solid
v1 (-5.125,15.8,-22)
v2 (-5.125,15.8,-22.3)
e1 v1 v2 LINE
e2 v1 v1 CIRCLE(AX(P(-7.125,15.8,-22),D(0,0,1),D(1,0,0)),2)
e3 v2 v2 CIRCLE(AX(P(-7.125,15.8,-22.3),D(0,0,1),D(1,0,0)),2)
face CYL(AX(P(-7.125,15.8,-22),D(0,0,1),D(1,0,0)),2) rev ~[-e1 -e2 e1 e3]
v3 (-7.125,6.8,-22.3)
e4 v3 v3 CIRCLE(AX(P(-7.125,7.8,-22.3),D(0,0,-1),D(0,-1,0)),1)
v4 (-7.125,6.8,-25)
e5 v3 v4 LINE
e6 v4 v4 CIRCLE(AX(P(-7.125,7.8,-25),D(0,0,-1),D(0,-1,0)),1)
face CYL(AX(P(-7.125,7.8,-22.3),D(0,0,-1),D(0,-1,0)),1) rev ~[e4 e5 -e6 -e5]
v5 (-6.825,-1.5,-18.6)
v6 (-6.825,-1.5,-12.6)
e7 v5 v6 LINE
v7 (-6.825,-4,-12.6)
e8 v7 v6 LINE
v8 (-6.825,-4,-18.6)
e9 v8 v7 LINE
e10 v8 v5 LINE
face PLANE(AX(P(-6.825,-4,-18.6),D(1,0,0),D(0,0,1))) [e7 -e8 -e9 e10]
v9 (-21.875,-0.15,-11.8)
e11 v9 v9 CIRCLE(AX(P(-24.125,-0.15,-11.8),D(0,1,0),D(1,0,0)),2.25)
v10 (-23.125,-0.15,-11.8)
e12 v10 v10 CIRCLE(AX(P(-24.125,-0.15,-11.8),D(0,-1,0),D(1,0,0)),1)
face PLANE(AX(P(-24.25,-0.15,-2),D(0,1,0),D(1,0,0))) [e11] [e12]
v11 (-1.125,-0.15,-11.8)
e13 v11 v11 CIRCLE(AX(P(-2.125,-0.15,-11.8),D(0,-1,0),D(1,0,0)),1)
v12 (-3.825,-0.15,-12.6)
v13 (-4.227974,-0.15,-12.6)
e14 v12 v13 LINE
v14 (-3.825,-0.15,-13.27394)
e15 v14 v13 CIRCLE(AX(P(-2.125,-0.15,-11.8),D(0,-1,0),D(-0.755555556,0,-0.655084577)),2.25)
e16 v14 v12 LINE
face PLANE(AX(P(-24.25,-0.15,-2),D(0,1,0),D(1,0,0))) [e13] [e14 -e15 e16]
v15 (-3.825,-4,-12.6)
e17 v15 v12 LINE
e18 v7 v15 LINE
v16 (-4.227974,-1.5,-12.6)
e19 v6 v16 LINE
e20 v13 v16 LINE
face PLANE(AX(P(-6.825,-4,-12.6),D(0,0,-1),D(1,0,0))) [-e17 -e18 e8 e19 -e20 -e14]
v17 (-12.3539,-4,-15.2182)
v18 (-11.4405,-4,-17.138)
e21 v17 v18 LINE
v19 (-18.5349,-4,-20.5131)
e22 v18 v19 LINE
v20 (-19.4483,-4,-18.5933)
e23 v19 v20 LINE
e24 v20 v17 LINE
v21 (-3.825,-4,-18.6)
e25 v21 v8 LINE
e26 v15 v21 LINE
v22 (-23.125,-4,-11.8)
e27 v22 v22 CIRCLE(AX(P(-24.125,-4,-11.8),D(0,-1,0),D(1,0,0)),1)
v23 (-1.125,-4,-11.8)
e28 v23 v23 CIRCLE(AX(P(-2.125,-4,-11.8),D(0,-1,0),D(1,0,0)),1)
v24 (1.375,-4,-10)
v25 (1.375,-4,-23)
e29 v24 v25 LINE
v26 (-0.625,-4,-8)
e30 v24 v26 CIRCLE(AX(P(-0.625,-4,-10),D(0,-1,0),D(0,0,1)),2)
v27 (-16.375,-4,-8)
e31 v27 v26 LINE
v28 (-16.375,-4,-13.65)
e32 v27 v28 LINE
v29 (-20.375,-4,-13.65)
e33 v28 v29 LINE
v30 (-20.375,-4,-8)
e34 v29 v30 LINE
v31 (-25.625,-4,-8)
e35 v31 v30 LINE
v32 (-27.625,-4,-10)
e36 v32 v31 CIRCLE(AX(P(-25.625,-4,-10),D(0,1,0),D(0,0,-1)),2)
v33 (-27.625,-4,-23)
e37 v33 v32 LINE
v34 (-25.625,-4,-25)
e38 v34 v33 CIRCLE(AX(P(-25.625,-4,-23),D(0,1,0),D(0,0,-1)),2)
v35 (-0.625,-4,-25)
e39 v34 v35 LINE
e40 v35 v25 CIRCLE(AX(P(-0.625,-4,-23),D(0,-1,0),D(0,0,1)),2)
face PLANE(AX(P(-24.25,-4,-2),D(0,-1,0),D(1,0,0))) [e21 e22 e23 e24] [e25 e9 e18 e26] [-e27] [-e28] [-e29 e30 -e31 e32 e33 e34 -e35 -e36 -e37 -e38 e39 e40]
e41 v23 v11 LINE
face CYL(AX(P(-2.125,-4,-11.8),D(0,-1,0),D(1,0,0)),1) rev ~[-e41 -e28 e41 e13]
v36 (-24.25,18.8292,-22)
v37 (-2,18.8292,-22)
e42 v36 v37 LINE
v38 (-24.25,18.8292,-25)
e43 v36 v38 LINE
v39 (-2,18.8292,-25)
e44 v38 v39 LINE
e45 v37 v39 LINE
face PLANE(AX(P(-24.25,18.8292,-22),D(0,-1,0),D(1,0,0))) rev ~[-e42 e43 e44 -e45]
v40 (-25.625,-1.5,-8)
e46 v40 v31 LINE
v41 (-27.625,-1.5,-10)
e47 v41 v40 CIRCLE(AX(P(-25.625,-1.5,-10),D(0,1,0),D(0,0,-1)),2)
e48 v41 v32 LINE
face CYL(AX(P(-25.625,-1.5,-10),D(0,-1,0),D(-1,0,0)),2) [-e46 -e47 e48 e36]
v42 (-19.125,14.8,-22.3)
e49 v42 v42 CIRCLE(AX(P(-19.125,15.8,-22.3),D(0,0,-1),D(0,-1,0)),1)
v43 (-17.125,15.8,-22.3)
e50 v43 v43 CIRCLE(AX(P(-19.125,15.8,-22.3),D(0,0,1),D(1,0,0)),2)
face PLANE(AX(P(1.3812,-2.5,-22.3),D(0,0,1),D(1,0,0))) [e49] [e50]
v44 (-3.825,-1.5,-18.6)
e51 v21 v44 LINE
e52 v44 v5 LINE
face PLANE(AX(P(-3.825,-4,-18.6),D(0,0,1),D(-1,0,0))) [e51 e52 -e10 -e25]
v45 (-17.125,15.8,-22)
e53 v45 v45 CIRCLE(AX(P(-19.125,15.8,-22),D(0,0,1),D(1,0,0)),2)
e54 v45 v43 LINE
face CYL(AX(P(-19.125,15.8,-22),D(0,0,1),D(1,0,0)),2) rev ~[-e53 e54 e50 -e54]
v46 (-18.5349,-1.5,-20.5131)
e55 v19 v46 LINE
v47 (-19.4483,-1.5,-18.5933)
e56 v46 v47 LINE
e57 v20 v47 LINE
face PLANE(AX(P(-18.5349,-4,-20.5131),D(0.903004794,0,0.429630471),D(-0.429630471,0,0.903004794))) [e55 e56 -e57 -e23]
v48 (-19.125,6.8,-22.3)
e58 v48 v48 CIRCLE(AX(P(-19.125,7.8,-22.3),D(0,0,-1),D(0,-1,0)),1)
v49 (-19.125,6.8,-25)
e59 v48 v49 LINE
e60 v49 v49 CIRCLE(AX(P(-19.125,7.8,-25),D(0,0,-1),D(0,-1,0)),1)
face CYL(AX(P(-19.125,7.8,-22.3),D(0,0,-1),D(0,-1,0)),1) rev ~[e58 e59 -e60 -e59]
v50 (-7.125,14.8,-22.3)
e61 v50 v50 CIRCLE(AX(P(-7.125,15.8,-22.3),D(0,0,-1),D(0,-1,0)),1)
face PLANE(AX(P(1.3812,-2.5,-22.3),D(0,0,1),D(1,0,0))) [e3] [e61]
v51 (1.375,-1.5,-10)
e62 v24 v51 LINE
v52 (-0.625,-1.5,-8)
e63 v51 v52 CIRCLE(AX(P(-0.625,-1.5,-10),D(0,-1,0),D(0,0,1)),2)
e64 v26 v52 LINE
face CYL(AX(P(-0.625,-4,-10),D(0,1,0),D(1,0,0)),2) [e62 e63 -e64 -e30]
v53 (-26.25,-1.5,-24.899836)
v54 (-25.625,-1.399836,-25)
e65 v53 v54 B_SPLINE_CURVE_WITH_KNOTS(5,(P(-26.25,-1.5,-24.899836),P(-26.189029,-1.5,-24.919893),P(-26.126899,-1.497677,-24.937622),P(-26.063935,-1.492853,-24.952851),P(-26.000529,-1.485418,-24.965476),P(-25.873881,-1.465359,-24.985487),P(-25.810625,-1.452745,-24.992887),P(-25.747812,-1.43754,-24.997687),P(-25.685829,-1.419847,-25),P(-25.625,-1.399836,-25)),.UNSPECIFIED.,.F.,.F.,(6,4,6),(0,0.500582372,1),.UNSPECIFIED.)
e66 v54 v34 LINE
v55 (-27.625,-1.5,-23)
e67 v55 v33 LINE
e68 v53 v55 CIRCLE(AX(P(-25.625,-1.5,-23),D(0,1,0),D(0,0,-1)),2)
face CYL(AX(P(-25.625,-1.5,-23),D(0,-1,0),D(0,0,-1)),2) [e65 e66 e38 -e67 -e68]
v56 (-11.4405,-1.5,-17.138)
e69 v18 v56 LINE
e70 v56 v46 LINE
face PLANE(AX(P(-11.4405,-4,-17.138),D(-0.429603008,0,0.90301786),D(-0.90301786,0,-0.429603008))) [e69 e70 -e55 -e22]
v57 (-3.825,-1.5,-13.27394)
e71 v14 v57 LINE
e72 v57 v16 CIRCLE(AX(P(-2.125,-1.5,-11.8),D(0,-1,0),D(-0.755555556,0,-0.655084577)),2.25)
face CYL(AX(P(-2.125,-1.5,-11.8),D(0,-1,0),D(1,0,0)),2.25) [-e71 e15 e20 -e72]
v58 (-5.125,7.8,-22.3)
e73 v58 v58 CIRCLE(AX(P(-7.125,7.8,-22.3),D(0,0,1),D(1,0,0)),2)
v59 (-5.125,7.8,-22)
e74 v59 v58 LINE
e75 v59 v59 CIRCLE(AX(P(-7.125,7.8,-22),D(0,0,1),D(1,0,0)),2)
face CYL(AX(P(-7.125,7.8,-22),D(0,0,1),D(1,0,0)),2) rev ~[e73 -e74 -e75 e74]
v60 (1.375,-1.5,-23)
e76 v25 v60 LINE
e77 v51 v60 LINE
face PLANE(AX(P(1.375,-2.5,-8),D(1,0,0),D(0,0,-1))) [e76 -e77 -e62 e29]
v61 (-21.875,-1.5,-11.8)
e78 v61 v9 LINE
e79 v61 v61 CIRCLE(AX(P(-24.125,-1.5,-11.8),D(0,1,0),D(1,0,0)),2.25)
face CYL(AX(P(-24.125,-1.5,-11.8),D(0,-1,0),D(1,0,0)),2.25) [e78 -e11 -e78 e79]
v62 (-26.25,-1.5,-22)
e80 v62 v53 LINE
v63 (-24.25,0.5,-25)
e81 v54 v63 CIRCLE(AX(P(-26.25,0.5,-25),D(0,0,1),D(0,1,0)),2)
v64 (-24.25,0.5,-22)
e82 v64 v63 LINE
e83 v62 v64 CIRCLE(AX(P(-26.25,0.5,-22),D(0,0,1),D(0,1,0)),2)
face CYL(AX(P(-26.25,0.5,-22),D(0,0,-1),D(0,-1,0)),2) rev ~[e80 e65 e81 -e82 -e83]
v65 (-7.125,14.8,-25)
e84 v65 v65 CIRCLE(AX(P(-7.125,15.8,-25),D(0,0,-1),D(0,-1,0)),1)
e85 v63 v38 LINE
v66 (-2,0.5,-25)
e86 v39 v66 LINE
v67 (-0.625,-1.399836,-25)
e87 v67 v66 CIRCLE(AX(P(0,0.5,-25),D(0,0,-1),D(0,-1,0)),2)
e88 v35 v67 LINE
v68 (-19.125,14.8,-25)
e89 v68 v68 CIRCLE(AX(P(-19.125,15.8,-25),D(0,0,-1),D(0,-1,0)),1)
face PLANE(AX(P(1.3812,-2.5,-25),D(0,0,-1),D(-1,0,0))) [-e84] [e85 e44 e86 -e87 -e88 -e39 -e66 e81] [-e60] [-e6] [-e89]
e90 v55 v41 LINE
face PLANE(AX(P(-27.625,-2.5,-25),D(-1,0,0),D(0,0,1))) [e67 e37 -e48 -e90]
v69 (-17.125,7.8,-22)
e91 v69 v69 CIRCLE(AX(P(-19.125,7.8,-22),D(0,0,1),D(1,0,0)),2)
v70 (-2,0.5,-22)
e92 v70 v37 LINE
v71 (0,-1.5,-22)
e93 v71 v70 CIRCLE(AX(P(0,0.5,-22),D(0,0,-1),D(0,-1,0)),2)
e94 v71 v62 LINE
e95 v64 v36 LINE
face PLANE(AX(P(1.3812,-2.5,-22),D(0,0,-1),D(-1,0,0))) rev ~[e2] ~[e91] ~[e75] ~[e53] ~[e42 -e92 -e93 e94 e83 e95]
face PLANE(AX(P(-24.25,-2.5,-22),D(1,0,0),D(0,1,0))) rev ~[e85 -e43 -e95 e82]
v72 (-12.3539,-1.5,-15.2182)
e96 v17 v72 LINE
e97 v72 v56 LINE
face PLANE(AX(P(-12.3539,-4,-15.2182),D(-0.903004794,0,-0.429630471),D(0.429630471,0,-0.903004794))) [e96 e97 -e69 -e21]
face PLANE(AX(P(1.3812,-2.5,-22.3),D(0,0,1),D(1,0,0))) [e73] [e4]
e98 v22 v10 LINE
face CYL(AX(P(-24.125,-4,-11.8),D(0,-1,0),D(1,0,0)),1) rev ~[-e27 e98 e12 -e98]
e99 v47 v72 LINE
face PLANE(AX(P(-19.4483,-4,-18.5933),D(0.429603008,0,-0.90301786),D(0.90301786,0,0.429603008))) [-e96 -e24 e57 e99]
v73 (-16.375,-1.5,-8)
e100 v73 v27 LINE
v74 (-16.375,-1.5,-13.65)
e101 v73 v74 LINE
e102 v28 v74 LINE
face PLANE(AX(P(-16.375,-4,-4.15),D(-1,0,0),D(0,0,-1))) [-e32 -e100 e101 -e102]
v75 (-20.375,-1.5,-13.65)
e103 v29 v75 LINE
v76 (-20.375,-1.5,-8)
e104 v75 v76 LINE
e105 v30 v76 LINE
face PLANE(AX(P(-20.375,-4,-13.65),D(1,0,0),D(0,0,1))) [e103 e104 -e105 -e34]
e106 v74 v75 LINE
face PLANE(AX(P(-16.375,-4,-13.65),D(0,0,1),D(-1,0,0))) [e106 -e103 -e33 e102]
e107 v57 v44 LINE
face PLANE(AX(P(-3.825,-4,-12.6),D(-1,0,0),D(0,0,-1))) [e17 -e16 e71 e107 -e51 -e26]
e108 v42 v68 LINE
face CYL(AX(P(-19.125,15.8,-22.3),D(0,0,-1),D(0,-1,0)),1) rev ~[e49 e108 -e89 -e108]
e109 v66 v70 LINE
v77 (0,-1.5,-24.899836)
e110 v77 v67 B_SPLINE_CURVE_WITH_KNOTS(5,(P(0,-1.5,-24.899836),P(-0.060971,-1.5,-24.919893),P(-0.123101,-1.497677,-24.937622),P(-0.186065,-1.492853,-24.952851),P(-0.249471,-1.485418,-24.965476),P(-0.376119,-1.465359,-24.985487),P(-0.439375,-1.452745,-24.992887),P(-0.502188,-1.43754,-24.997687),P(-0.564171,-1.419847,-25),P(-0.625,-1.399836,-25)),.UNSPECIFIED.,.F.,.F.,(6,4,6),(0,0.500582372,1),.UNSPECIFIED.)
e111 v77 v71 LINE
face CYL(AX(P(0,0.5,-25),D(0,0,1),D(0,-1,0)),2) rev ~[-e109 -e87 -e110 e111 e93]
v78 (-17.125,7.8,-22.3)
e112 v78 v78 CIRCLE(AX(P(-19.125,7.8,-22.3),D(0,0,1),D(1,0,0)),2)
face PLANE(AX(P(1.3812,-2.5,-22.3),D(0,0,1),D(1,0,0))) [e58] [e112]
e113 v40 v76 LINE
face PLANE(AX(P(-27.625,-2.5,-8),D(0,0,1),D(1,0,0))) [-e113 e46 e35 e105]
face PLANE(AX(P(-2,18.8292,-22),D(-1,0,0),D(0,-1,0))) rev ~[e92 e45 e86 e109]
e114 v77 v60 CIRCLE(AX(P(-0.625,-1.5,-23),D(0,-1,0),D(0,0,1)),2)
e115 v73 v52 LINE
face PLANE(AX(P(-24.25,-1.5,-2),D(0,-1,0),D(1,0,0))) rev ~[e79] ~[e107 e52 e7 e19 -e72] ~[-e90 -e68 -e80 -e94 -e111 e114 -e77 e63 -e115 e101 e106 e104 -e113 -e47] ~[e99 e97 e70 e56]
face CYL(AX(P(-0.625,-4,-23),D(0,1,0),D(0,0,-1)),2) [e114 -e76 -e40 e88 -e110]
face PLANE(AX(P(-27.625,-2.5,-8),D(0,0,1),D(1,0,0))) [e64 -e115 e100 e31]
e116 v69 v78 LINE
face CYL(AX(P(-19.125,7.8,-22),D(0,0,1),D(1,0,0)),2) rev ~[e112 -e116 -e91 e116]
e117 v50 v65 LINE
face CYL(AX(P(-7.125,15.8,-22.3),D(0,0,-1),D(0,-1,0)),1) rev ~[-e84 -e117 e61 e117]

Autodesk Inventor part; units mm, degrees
ref_plane "YZ Plane" through (0, 0, 0) normal (1, 0, 0) x (0, 1, 0)
ref_plane "XZ Plane" through (0, 0, 0) normal (0, 1, 0) x (-1, 0, 0)
ref_plane "XY Plane" through (0, 0, 0) normal (0, 0, 1) x (1, 0, 0)
sketch "Sketch1" plane through (0, 0, 0) normal (0, 1, 0) x (-1, 0, 0)
  line L0 (0, 0) -> (26.25, 0) construction
  line L1 (26.25, 0) -> (26.25, -22) construction
  line L2 (26.25, -22) -> (0, -22) construction
  line L3 (0, -22) -> (0, 0) construction
  circle A0 centre (2, -20) radius 1.95
  circle A1 centre (24.25, -2) radius 2
  dimension "d0" = 26.25
  dimension "d1" = 22
  dimension "d3" = 3.9
  dimension "d6" = 4
  dimension "d18" = 2
  dimension "d19" = 2
  dimension "d20" = 2
  dimension "d21" = 2
extrude "Extrusion1" add sketch "Sketch1" along normal blind 2.8
sketch "Sketch6" plane through (-24.25, 0, -2) normal (0, -1, 0) x (1, 0, 0)
  circle A0 centre (0, 0) radius 2 construction
  circle A1 centre (22.25, -18) radius 1.95 construction
  line L0 (-7.7702, -20) -> (30.063, -20) construction
  line L1 (1.9389, 3.3329) -> (25.6312, -15.8338)
  line L2 (25.6312, -15.8338) -> (25.6312, -20)
  circle A2 centre (22.25, -18) radius 1.95 projected
  line L3 (4, -20) -> (4, -16)
  line L4 (4, -16) -> (12.25, -16)
  line L5 (12.25, -16) -> (12.25, -20)
  line L6 (25.6312, -20) -> (12.25, -20)
  line L7 (4, -20) -> (-3.1908, -20)
  line L8 (2.5513, -5.9922) -> (9.3088, -11.459)
  line L9 (9.3088, -11.459) -> (2.5513, -11.459)
  line L10 (2.5513, -11.459) -> (2.5513, -5.9922)
  line L11 (-3.1908, -20) -> (-3.1908, 3.3329)
  line L12 (1.9389, 3.3329) -> (-3.1908, 3.3329)
  point P0 (24.25, 2)
  dimension "d28" = 2
  dimension "d31" = 10
  dimension "d32" = 4
  dimension "d40" = 4
extrude "Extrusion6" add sketch "Sketch6" along normal blind 2.5 contours L1 L2 L6 L5 L4 L3 L7 L11 L12 | A2
fillet "Fillet1" radius 2 1 edges at (-22.25, 0, -2)
hole "Hole1" at (-24.25, 2.8, -2) direction (0, -1, 0) diameter 2 depth 8 tip angle 118
hole "Hole2" at (-2, 2.8, -20) direction (0, -1, 0) diameter 2 depth 8 tip angle 118
fillet "Fillet2" radius 2 1 edges at (-0.05, 0, -20)
sketch "Sketch10" plane through (1.3812, -2.5, -22) normal (0, 0, -1) x (-1, 0, 0)
  line L0 (25.6312, -4.2658) -> (25.6312, 25.595) construction
  line L1 (3.3812, -4.2658) -> (3.3812, 25.595) construction
  line L2 (0, 0) -> (23.6922, 0) projected
  line L3 (3.3812, 0) -> (25.6312, 0)
  line L4 (25.6312, 0) -> (25.6312, 21.3292)
  line L5 (25.6312, 21.3292) -> (3.3812, 21.3292)
  line L6 (3.3812, 21.3292) -> (3.3812, 0)
  point P0 (1.3812, 2.5)
extrude "Extrusion8" add sketch "Sketch10" along normal blind 3
fillet "Fillet3" radius 2 1 edges at (-2, -0.4722, -22)
fillet "Fillet4" radius 2 1 edges at (-24.25, -1.25, -22)
fillet "Fillet5" radius 2 1 edges at (-22.25, 0, -22)
sketch "Sketch12" plane through (1.3812, -2.5, -22) normal (0, 0, 1) x (1, 0, 0)
  line L0 (-23.6312, 5.3) -> (-27.6312, 5.3) construction
  line L1 (-1.4312, 5.3) -> (-5.3312, 5.3) construction
  circle A0 centre (-20.5062, 18.3) radius 2
  circle A1 centre (-20.5062, 10.3) radius 2
  line L2 (-25.6312, 4.5) -> (-25.6312, 21.3292) projected
  line L3 (-3.3812, 21.3292) -> (-3.3812, 0) construction
  line L4 (-3.3812, 12.9146) -> (-25.6312, 12.9146) construction
  line L5 (-14.5062, 12.9146) -> (-14.5062, 6.5641) construction
  circle A2 centre (-8.5062, 18.3) radius 2
  circle A3 centre (-8.5062, 10.3) radius 2
  point P0 (-1.3812, 2.5)
  dimension "d67" = 4
  dimension "d70" = 5.125
  dimension "d72" = 5
  dimension "d73" = 5.125
  dimension "d112" = 12
  dimension "d113" = 8
extrude "Extrusion9" cut sketch "Sketch12" against normal blind 0.3
hole "Hole3" at (-19.125, 7.8, -22.3) direction (0, 0, -1) diameter 2 depth 8 tip angle 118
hole "Hole4" at (-19.125, 15.8, -22.3) direction (0, 0, -1) diameter 2 depth 8 tip angle 118
hole "Hole5" at (-7.125, 15.8, -22.3) direction (0, 0, -1) diameter 2 depth 8 tip angle 118
hole "Hole6" at (-7.125, 7.8, -22.3) direction (0, 0, -1) diameter 2 depth 8 tip angle 118
ref_plane "Work Plane3" through (-13.125, 7.8, -26.3) normal (-1, 0, 0) x (0, 0, 1)
ref_plane "Work Plane1" through (-7.125, 15.8, -26.3) normal (1, 0, 0) x (0, 0, 1)
ref_plane "Work Plane2" through (-19.125, 7.8, -26.3) normal (-1, 0, 0) x (0, 0, 1)
sketch "Sketch14" plane through (-24.25, 18.8292, -22) normal (0, 1, 0) x (1, 0, 0)
  line L0 (22.25, 0) -> (0, 0)
  line L1 (0, 0) -> (0, 3)
  line L2 (22.25, 3) -> (0, 3) projected
  line L3 (22.25, 3) -> (22.25, 0)
  arc A0 (0, 3) -> (22.25, 3) centre (11.125, -42.8915) ccw
  point P0 (24.25, -22)
extrude "Extrusion11" cut sketch "Sketch14" against normal through all contours L3 A0 L1 L0
sketch "Sketch15" plane through (-24.25, -2.5, -2) normal (0, -1, 0) x (1, 0, 0)
  line L0 (-3.375, -6) -> (25.625, -6)
  line L1 (25.625, -6) -> (25.625, -23)
  line L2 (25.625, -23) -> (-3.375, -23)
  line L3 (-3.375, -23) -> (-3.375, -6)
  line L4 (22.25, -20) -> (0, -20) construction
  line L5 (11.125, -28) -> (11.125, 7) construction
  line L6 (0, -20) -> (22.25, -20) construction
  line L7 (22.25, -23) -> (0, -23) projected
  point P0 (24.25, 2)
  point P1 (11.125, -23)
  point P2 (11.125, -20)
  point P3 (11.125, -20)
  point P4 (11.125, -23)
  point P5 (11.125, -23)
  dimension "d128" = 29
  dimension "d129" = 17
extrude "Extrusion12" add sketch "Sketch15" along normal blind 1.5 and the other way blind 1
sketch "Sketch19" plane through (-24.25, -1.5, -2) normal (0, 1, 0) x (1, 0, 0)
  circle A0 centre (22.125, 9.8) radius 2.25
  circle A1 centre (0.125, 9.8) radius 2.25
  line L0 (0.125, 9.8) -> (22.125, 9.8) construction
  line L1 (11.125, -7) -> (11.125, 28) construction
  line L2 (0, 20) -> (22.25, 20) construction
  line L3 (0, 20) -> (22.25, 20) construction
  line L4 (19.125, 20) -> (15.125, 20) construction
  line L5 (7.125, 20) -> (3.125, 20) construction
  line L6 (7.125, 20) -> (3.125, 20) construction
  line L7 (19.125, 20) -> (15.125, 20) construction
  point P0 (24.25, -2)
  point P1 (11.125, 9.8)
  dimension "d154" = 4.5
  dimension "d155" = 4.5
  dimension "d156" = 22
  dimension "d157" = 10.2
extrude "Extrusion16" add sketch "Sketch19" along normal blind 1.35
sketch "Sketch16" plane through (-24.25, -4, -2) normal (0, -1, 0) x (1, 0, 0)
  line L0 (15.125, -20) -> (19.125, -20) construction
  line L1 (3.125, -20) -> (7.125, -20) construction
  line L2 (3.125, -20) -> (7.125, -20) construction
  line L3 (15.125, -20) -> (19.125, -20) construction
  line L4 (0, -20) -> (22.25, -20) construction
  line L5 (0, -20) -> (22.25, -20) construction
  line L6 (0, -23) -> (0, -20) construction
  line L7 (22.25, -20) -> (22.25, -23) construction
  line L8 (11.125, -28) -> (11.125, 7) construction
  circle A0 centre (0.125, -9.8) radius 1
  circle A1 centre (22.125, -9.8) radius 1
  line L9 (0.125, -9.8) -> (22.125, -9.8) construction
  point P0 (24.25, 2)
  point P1 (11.125, -9.8)
  dimension "d132" = 2
  dimension "d133" = 2
  dimension "d134" = 22
  dimension "d135" = 10.2
extrude "Extrusion13" cut sketch "Sketch16" against normal through all
sketch "Sketch17" plane through (-24.25, -4, -2) normal (0, -1, 0) x (1, 0, 0)
  line L0 (15.125, -20) -> (19.125, -20) construction
  line L1 (3.125, -20) -> (7.125, -20) construction
  line L2 (3.125, -20) -> (7.125, -20) construction
  line L3 (15.125, -20) -> (19.125, -20) construction
  line L4 (0, -20) -> (22.25, -20) construction
  line L5 (0, -20) -> (22.25, -20) construction
  line L6 (22.25, -20) -> (22.25, -23) construction
  line L7 (22.25, -20) -> (22.25, -23) construction
  line L8 (0, -20) -> (0, -23) construction
  line L9 (0, -23) -> (0, -20) construction
  line L10 (3.875, -2.15) -> (7.875, -2.15)
  line L11 (7.875, -2.15) -> (7.875, -11.65)
  line L12 (7.875, -11.65) -> (3.875, -11.65)
  line L13 (3.875, -11.65) -> (3.875, -2.15)
  circle A0 centre (22.125, -9.8) radius 1 projected
  line L14 (17.425, -10.6) -> (20.425, -10.6)
  line L15 (20.425, -10.6) -> (20.425, -16.6)
  line L16 (20.425, -16.6) -> (17.425, -16.6)
  line L17 (17.425, -16.6) -> (17.425, -10.6)
  circle A1 centre (0.125, -9.8) radius 1 projected
  point P0 (24.25, 2)
  dimension "d138" = 9.5
  dimension "d139" = 4
  dimension "d142" = 6
  dimension "d143" = 3
  dimension "d161" = 3.75
  dimension "d162" = 1.7
  dimension "d163" = 3.4
  dimension "d164" = 8.35
extrude "Extrusion14" cut sketch "Sketch17" against normal through all contours L10 L11 L12 L13 | L14 L15 L16 L17
fillet "Fillet9" radius 2 4 edges at (1.375, -2.75, -25) (1.375, -2.75, -8) (-27.625, -2.75, -8) (-27.625, -2.75, -25)
fillet "Fillet10" radius 2 2 edges at (-2, -1.5, -23.5) (-24.25, -1.5, -23.5)
sketch "Sketch20" plane through (-24.25, -4, -2) normal (0, -1, 0) x (1, 0, 0)
  line L0 (24.25, -20) -> (-2, -20) construction
  line L1 (22.25, -20) -> (24.25, -20) construction
  line L2 (0, -20) -> (22.25, -20) construction
  line L3 (-2, -20) -> (0, -20) construction
  line L4 (15.125, -20) -> (19.125, -20) construction
  line L5 (3.125, -20) -> (7.125, -20) construction
  line L6 (3.125, -20) -> (7.125, -20) construction
  line L7 (15.125, -20) -> (19.125, -20) construction
  line L8 (0, -20) -> (0, -23) construction
  line L9 (0, -20) -> (0, -23) construction
  line L10 (22.25, -23) -> (22.25, -20) construction
  line L11 (22.25, -20) -> (22.25, -23) construction
  line L12 (4.8017, -16.5933) -> (11.8961, -13.2182)
  line L13 (11.8961, -13.2182) -> (12.8095, -15.138)
  line L14 (12.8095, -15.138) -> (5.7151, -18.5131)
  line L15 (5.7151, -18.5131) -> (4.8017, -16.5933)
  point P0 (24.25, 2)
extrude "Extrusion17" cut sketch "Sketch20" against normal through all
properties part number "camera_support_.Fatshark_600TVLipt" material "ABS Plastic"
